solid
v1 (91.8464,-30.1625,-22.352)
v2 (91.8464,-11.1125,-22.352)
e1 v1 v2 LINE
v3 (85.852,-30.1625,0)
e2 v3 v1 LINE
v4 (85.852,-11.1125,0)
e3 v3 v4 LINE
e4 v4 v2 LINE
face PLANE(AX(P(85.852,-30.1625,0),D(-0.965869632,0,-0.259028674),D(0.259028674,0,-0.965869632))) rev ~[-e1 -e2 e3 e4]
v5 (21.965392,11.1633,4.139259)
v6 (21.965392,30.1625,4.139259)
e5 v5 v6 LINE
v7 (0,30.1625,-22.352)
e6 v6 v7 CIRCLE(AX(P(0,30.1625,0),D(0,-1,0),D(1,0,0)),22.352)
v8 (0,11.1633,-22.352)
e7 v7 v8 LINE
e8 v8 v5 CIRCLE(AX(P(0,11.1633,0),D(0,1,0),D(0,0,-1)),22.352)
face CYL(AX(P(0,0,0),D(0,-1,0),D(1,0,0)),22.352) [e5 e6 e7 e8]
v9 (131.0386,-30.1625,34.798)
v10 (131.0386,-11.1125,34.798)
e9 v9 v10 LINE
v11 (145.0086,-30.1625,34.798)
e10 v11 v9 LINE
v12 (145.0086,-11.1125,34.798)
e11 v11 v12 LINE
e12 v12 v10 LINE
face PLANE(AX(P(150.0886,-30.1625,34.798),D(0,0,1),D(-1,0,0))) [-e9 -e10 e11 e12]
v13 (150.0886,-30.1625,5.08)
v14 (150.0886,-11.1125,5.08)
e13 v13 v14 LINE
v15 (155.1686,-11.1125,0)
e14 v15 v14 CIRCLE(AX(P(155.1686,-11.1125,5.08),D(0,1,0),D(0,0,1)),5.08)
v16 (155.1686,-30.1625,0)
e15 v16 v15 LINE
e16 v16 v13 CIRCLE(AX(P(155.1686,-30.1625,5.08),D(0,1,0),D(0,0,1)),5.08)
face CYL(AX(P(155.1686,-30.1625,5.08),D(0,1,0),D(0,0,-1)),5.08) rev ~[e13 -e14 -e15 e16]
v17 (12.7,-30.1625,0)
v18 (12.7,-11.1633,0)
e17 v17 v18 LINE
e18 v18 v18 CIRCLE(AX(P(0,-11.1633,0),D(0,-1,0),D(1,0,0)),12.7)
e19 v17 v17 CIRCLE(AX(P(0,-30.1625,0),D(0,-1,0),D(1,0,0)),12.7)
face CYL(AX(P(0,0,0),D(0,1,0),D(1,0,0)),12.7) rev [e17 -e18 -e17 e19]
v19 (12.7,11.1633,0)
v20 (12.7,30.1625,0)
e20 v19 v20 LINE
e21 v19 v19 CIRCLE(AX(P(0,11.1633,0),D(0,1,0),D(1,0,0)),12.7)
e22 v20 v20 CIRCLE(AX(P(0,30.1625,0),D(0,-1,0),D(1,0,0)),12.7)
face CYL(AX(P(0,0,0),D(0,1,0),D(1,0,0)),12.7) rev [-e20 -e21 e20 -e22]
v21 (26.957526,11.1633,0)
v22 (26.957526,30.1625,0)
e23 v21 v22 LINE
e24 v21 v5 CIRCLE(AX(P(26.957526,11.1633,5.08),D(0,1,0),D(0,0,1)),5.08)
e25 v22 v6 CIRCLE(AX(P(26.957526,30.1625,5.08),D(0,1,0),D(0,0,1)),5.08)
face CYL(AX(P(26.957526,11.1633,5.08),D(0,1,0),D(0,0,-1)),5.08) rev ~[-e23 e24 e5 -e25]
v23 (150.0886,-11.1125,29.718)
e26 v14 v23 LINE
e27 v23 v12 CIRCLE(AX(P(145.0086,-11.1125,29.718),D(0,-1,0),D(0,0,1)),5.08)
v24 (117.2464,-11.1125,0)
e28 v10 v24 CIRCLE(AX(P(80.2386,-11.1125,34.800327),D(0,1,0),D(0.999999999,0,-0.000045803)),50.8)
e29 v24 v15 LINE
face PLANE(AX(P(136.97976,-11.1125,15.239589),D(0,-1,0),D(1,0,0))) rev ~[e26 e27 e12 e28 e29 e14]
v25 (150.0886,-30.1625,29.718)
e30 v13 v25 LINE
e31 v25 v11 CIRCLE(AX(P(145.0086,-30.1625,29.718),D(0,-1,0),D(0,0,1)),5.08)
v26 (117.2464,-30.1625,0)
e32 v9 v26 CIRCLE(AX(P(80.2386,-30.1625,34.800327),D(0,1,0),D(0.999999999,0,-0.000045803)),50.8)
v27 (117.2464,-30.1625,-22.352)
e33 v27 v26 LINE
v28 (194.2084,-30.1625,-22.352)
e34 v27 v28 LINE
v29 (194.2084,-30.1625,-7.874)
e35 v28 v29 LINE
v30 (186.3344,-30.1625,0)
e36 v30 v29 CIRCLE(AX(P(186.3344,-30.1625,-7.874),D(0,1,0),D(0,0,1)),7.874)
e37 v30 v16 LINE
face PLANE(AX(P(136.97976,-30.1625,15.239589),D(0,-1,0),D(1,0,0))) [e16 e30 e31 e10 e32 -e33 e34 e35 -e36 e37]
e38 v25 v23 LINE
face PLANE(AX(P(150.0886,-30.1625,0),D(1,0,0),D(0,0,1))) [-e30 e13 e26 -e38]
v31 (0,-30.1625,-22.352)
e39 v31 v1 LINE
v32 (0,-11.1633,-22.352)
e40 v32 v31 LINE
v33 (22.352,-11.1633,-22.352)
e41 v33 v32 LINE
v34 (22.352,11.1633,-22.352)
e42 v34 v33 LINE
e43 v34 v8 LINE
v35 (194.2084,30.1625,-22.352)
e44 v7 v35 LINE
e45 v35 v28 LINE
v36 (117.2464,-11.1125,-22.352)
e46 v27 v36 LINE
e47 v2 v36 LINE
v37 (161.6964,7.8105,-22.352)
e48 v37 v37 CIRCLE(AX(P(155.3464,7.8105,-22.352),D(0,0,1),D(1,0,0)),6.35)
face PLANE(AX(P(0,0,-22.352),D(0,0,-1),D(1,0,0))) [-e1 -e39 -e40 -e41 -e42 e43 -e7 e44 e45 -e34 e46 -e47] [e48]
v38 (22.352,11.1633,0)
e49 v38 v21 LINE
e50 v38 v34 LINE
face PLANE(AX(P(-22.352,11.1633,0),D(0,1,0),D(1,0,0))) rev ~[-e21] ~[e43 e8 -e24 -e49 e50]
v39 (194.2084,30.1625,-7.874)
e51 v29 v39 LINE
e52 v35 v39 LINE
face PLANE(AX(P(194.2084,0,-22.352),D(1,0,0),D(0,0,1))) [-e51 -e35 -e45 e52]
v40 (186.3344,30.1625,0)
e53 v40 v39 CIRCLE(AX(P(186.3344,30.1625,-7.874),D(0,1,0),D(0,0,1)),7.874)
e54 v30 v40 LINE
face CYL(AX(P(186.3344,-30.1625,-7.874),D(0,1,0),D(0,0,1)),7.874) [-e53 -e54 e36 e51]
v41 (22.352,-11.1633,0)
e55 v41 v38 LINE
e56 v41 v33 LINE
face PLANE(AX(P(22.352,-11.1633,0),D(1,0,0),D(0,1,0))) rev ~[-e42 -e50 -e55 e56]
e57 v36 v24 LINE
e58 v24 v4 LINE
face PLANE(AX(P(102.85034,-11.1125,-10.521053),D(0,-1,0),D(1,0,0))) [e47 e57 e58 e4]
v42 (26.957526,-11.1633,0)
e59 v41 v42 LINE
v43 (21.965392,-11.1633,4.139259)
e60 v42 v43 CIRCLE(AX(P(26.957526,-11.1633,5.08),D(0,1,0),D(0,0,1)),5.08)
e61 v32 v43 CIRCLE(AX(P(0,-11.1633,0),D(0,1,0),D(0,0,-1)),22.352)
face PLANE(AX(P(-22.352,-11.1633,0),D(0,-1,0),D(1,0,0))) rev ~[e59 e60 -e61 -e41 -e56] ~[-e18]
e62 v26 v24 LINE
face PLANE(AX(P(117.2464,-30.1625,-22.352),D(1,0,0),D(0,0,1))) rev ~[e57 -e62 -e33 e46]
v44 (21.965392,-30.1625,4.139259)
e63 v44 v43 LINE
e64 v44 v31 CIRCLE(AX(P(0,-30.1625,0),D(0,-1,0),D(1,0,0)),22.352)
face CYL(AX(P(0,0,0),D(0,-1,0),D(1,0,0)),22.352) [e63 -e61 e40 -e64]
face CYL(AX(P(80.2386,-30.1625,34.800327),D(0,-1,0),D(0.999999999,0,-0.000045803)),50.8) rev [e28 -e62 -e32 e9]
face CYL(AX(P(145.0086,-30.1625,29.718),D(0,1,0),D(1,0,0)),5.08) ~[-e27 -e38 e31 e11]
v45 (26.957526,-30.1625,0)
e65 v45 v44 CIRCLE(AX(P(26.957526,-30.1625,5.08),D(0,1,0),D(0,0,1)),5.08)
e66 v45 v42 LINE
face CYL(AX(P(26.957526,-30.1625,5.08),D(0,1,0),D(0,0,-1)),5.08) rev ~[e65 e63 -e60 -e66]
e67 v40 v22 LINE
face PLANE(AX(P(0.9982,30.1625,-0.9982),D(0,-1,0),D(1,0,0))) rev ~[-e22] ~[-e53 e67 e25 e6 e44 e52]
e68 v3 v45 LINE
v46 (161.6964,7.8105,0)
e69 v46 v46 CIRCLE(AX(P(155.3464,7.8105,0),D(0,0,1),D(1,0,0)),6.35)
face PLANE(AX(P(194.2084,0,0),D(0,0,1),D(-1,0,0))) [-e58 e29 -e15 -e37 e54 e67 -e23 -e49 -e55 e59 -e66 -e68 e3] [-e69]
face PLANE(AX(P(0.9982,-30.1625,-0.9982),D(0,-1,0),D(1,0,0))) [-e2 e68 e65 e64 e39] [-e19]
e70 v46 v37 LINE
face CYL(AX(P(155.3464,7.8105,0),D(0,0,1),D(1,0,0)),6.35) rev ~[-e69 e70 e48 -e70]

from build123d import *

# Parameters (mm, degrees)
F0_R          = 12.7
F0_W          = 76.962
F0_H          = 22.352
F1_DEPTH      = 30.1625
F2_W          = 44.704
F2_H          = 22.3266
F3_DEPTH      = 22.353
F3_DEPTH_BACK = 22.353
F2_R          = 6.35
F4_DEPTH      = 22.353
F6_DEPTH      = 19.05
F8_DEPTH      = 19.05
F9_R          = 7.874
F10_R         = 5.08


with BuildPart() as f1:
    # F0 (on Front) → F1 (new body, symmetric)
    with BuildSketch(Plane.XZ):
        with BuildLine():
            ThreePointArc((0, -22.352), (15.8052507731, -15.8052507731), (22.352, 0))
            ThreePointArc((22.352, 0), (-15.8052507731, 15.8052507731), (0, -22.352))
        make_face()
        Circle(F0_R, mode=Mode.SUBTRACT)
        with BuildLine():
            Line((85.852, 0), (22.352, 0))
            ThreePointArc((22.352, 0), (15.8052507731, -15.8052507731), (0, -22.352))
            Line((0, -22.352), (91.8464, -22.352))
            Line((91.8464, -22.352), (85.852, 0))
        make_face()
        with Locations((155.7274, -11.176)):
            Rectangle(F0_W, F0_H)
        Polygon((117.2464, 0), (85.852, 0), (91.8464, -22.352), (117.2464, -22.352), align=None)
    extrude(amount=F1_DEPTH, both=True)

    # F2 (on face) → F3 (cut, two sides)
    with BuildSketch(Plane.XY) as f3_sk:
        Rectangle(F2_W, F2_H)
    extrude(amount=F3_DEPTH, mode=Mode.SUBTRACT)
    extrude(f3_sk.sketch, amount=-F3_DEPTH_BACK, mode=Mode.SUBTRACT)

    # F2 (on face) → F4 (cut, through all)
    with BuildSketch(Plane.XY):
        with Locations((155.3464, 7.8105)):
            Circle(F2_R)
    extrude(amount=-F4_DEPTH, mode=Mode.SUBTRACT)

    # F5 (on face) → F6 (cut)
    with BuildSketch(Plane.XZ.offset(30.1625)):
        Polygon((117.2464, 0), (85.852, 0), (91.8464, -22.352), (117.2464, -22.352), align=None)
    extrude(amount=-F6_DEPTH, mode=Mode.SUBTRACT)

    # F7 (on face) → F8 (join)
    with BuildSketch(Plane.XZ.offset(30.1625)):
        with BuildLine():
            Line((117.2464, 0), (150.0886, 0))
            Line((150.0886, 0), (150.0886, 34.798))
            Line((150.0886, 34.798), (131.0386, 34.798))
            ThreePointArc((131.0386, 34.798), (127.4644153616, 16.0823576341), (117.2464, 0))
        make_face()
    extrude(amount=-F8_DEPTH)

    # F9
    f9_edges = [f1.edges().sort_by_distance(p)[0] for p in [
        (194.2084, 0, 0),
    ]]
    fillet(f9_edges, radius=F9_R)

    # F10
    f10_edges = [f1.edges().sort_by_distance(p)[0] for p in [
        (150.0886, -20.6375, 34.798),
        (150.0886, -20.6375, 0),
        (22.352, 20.6629, 0),
        (22.352, -20.6629, 0),
    ]]
    fillet(f10_edges, radius=F10_R)


solid = f1.part
